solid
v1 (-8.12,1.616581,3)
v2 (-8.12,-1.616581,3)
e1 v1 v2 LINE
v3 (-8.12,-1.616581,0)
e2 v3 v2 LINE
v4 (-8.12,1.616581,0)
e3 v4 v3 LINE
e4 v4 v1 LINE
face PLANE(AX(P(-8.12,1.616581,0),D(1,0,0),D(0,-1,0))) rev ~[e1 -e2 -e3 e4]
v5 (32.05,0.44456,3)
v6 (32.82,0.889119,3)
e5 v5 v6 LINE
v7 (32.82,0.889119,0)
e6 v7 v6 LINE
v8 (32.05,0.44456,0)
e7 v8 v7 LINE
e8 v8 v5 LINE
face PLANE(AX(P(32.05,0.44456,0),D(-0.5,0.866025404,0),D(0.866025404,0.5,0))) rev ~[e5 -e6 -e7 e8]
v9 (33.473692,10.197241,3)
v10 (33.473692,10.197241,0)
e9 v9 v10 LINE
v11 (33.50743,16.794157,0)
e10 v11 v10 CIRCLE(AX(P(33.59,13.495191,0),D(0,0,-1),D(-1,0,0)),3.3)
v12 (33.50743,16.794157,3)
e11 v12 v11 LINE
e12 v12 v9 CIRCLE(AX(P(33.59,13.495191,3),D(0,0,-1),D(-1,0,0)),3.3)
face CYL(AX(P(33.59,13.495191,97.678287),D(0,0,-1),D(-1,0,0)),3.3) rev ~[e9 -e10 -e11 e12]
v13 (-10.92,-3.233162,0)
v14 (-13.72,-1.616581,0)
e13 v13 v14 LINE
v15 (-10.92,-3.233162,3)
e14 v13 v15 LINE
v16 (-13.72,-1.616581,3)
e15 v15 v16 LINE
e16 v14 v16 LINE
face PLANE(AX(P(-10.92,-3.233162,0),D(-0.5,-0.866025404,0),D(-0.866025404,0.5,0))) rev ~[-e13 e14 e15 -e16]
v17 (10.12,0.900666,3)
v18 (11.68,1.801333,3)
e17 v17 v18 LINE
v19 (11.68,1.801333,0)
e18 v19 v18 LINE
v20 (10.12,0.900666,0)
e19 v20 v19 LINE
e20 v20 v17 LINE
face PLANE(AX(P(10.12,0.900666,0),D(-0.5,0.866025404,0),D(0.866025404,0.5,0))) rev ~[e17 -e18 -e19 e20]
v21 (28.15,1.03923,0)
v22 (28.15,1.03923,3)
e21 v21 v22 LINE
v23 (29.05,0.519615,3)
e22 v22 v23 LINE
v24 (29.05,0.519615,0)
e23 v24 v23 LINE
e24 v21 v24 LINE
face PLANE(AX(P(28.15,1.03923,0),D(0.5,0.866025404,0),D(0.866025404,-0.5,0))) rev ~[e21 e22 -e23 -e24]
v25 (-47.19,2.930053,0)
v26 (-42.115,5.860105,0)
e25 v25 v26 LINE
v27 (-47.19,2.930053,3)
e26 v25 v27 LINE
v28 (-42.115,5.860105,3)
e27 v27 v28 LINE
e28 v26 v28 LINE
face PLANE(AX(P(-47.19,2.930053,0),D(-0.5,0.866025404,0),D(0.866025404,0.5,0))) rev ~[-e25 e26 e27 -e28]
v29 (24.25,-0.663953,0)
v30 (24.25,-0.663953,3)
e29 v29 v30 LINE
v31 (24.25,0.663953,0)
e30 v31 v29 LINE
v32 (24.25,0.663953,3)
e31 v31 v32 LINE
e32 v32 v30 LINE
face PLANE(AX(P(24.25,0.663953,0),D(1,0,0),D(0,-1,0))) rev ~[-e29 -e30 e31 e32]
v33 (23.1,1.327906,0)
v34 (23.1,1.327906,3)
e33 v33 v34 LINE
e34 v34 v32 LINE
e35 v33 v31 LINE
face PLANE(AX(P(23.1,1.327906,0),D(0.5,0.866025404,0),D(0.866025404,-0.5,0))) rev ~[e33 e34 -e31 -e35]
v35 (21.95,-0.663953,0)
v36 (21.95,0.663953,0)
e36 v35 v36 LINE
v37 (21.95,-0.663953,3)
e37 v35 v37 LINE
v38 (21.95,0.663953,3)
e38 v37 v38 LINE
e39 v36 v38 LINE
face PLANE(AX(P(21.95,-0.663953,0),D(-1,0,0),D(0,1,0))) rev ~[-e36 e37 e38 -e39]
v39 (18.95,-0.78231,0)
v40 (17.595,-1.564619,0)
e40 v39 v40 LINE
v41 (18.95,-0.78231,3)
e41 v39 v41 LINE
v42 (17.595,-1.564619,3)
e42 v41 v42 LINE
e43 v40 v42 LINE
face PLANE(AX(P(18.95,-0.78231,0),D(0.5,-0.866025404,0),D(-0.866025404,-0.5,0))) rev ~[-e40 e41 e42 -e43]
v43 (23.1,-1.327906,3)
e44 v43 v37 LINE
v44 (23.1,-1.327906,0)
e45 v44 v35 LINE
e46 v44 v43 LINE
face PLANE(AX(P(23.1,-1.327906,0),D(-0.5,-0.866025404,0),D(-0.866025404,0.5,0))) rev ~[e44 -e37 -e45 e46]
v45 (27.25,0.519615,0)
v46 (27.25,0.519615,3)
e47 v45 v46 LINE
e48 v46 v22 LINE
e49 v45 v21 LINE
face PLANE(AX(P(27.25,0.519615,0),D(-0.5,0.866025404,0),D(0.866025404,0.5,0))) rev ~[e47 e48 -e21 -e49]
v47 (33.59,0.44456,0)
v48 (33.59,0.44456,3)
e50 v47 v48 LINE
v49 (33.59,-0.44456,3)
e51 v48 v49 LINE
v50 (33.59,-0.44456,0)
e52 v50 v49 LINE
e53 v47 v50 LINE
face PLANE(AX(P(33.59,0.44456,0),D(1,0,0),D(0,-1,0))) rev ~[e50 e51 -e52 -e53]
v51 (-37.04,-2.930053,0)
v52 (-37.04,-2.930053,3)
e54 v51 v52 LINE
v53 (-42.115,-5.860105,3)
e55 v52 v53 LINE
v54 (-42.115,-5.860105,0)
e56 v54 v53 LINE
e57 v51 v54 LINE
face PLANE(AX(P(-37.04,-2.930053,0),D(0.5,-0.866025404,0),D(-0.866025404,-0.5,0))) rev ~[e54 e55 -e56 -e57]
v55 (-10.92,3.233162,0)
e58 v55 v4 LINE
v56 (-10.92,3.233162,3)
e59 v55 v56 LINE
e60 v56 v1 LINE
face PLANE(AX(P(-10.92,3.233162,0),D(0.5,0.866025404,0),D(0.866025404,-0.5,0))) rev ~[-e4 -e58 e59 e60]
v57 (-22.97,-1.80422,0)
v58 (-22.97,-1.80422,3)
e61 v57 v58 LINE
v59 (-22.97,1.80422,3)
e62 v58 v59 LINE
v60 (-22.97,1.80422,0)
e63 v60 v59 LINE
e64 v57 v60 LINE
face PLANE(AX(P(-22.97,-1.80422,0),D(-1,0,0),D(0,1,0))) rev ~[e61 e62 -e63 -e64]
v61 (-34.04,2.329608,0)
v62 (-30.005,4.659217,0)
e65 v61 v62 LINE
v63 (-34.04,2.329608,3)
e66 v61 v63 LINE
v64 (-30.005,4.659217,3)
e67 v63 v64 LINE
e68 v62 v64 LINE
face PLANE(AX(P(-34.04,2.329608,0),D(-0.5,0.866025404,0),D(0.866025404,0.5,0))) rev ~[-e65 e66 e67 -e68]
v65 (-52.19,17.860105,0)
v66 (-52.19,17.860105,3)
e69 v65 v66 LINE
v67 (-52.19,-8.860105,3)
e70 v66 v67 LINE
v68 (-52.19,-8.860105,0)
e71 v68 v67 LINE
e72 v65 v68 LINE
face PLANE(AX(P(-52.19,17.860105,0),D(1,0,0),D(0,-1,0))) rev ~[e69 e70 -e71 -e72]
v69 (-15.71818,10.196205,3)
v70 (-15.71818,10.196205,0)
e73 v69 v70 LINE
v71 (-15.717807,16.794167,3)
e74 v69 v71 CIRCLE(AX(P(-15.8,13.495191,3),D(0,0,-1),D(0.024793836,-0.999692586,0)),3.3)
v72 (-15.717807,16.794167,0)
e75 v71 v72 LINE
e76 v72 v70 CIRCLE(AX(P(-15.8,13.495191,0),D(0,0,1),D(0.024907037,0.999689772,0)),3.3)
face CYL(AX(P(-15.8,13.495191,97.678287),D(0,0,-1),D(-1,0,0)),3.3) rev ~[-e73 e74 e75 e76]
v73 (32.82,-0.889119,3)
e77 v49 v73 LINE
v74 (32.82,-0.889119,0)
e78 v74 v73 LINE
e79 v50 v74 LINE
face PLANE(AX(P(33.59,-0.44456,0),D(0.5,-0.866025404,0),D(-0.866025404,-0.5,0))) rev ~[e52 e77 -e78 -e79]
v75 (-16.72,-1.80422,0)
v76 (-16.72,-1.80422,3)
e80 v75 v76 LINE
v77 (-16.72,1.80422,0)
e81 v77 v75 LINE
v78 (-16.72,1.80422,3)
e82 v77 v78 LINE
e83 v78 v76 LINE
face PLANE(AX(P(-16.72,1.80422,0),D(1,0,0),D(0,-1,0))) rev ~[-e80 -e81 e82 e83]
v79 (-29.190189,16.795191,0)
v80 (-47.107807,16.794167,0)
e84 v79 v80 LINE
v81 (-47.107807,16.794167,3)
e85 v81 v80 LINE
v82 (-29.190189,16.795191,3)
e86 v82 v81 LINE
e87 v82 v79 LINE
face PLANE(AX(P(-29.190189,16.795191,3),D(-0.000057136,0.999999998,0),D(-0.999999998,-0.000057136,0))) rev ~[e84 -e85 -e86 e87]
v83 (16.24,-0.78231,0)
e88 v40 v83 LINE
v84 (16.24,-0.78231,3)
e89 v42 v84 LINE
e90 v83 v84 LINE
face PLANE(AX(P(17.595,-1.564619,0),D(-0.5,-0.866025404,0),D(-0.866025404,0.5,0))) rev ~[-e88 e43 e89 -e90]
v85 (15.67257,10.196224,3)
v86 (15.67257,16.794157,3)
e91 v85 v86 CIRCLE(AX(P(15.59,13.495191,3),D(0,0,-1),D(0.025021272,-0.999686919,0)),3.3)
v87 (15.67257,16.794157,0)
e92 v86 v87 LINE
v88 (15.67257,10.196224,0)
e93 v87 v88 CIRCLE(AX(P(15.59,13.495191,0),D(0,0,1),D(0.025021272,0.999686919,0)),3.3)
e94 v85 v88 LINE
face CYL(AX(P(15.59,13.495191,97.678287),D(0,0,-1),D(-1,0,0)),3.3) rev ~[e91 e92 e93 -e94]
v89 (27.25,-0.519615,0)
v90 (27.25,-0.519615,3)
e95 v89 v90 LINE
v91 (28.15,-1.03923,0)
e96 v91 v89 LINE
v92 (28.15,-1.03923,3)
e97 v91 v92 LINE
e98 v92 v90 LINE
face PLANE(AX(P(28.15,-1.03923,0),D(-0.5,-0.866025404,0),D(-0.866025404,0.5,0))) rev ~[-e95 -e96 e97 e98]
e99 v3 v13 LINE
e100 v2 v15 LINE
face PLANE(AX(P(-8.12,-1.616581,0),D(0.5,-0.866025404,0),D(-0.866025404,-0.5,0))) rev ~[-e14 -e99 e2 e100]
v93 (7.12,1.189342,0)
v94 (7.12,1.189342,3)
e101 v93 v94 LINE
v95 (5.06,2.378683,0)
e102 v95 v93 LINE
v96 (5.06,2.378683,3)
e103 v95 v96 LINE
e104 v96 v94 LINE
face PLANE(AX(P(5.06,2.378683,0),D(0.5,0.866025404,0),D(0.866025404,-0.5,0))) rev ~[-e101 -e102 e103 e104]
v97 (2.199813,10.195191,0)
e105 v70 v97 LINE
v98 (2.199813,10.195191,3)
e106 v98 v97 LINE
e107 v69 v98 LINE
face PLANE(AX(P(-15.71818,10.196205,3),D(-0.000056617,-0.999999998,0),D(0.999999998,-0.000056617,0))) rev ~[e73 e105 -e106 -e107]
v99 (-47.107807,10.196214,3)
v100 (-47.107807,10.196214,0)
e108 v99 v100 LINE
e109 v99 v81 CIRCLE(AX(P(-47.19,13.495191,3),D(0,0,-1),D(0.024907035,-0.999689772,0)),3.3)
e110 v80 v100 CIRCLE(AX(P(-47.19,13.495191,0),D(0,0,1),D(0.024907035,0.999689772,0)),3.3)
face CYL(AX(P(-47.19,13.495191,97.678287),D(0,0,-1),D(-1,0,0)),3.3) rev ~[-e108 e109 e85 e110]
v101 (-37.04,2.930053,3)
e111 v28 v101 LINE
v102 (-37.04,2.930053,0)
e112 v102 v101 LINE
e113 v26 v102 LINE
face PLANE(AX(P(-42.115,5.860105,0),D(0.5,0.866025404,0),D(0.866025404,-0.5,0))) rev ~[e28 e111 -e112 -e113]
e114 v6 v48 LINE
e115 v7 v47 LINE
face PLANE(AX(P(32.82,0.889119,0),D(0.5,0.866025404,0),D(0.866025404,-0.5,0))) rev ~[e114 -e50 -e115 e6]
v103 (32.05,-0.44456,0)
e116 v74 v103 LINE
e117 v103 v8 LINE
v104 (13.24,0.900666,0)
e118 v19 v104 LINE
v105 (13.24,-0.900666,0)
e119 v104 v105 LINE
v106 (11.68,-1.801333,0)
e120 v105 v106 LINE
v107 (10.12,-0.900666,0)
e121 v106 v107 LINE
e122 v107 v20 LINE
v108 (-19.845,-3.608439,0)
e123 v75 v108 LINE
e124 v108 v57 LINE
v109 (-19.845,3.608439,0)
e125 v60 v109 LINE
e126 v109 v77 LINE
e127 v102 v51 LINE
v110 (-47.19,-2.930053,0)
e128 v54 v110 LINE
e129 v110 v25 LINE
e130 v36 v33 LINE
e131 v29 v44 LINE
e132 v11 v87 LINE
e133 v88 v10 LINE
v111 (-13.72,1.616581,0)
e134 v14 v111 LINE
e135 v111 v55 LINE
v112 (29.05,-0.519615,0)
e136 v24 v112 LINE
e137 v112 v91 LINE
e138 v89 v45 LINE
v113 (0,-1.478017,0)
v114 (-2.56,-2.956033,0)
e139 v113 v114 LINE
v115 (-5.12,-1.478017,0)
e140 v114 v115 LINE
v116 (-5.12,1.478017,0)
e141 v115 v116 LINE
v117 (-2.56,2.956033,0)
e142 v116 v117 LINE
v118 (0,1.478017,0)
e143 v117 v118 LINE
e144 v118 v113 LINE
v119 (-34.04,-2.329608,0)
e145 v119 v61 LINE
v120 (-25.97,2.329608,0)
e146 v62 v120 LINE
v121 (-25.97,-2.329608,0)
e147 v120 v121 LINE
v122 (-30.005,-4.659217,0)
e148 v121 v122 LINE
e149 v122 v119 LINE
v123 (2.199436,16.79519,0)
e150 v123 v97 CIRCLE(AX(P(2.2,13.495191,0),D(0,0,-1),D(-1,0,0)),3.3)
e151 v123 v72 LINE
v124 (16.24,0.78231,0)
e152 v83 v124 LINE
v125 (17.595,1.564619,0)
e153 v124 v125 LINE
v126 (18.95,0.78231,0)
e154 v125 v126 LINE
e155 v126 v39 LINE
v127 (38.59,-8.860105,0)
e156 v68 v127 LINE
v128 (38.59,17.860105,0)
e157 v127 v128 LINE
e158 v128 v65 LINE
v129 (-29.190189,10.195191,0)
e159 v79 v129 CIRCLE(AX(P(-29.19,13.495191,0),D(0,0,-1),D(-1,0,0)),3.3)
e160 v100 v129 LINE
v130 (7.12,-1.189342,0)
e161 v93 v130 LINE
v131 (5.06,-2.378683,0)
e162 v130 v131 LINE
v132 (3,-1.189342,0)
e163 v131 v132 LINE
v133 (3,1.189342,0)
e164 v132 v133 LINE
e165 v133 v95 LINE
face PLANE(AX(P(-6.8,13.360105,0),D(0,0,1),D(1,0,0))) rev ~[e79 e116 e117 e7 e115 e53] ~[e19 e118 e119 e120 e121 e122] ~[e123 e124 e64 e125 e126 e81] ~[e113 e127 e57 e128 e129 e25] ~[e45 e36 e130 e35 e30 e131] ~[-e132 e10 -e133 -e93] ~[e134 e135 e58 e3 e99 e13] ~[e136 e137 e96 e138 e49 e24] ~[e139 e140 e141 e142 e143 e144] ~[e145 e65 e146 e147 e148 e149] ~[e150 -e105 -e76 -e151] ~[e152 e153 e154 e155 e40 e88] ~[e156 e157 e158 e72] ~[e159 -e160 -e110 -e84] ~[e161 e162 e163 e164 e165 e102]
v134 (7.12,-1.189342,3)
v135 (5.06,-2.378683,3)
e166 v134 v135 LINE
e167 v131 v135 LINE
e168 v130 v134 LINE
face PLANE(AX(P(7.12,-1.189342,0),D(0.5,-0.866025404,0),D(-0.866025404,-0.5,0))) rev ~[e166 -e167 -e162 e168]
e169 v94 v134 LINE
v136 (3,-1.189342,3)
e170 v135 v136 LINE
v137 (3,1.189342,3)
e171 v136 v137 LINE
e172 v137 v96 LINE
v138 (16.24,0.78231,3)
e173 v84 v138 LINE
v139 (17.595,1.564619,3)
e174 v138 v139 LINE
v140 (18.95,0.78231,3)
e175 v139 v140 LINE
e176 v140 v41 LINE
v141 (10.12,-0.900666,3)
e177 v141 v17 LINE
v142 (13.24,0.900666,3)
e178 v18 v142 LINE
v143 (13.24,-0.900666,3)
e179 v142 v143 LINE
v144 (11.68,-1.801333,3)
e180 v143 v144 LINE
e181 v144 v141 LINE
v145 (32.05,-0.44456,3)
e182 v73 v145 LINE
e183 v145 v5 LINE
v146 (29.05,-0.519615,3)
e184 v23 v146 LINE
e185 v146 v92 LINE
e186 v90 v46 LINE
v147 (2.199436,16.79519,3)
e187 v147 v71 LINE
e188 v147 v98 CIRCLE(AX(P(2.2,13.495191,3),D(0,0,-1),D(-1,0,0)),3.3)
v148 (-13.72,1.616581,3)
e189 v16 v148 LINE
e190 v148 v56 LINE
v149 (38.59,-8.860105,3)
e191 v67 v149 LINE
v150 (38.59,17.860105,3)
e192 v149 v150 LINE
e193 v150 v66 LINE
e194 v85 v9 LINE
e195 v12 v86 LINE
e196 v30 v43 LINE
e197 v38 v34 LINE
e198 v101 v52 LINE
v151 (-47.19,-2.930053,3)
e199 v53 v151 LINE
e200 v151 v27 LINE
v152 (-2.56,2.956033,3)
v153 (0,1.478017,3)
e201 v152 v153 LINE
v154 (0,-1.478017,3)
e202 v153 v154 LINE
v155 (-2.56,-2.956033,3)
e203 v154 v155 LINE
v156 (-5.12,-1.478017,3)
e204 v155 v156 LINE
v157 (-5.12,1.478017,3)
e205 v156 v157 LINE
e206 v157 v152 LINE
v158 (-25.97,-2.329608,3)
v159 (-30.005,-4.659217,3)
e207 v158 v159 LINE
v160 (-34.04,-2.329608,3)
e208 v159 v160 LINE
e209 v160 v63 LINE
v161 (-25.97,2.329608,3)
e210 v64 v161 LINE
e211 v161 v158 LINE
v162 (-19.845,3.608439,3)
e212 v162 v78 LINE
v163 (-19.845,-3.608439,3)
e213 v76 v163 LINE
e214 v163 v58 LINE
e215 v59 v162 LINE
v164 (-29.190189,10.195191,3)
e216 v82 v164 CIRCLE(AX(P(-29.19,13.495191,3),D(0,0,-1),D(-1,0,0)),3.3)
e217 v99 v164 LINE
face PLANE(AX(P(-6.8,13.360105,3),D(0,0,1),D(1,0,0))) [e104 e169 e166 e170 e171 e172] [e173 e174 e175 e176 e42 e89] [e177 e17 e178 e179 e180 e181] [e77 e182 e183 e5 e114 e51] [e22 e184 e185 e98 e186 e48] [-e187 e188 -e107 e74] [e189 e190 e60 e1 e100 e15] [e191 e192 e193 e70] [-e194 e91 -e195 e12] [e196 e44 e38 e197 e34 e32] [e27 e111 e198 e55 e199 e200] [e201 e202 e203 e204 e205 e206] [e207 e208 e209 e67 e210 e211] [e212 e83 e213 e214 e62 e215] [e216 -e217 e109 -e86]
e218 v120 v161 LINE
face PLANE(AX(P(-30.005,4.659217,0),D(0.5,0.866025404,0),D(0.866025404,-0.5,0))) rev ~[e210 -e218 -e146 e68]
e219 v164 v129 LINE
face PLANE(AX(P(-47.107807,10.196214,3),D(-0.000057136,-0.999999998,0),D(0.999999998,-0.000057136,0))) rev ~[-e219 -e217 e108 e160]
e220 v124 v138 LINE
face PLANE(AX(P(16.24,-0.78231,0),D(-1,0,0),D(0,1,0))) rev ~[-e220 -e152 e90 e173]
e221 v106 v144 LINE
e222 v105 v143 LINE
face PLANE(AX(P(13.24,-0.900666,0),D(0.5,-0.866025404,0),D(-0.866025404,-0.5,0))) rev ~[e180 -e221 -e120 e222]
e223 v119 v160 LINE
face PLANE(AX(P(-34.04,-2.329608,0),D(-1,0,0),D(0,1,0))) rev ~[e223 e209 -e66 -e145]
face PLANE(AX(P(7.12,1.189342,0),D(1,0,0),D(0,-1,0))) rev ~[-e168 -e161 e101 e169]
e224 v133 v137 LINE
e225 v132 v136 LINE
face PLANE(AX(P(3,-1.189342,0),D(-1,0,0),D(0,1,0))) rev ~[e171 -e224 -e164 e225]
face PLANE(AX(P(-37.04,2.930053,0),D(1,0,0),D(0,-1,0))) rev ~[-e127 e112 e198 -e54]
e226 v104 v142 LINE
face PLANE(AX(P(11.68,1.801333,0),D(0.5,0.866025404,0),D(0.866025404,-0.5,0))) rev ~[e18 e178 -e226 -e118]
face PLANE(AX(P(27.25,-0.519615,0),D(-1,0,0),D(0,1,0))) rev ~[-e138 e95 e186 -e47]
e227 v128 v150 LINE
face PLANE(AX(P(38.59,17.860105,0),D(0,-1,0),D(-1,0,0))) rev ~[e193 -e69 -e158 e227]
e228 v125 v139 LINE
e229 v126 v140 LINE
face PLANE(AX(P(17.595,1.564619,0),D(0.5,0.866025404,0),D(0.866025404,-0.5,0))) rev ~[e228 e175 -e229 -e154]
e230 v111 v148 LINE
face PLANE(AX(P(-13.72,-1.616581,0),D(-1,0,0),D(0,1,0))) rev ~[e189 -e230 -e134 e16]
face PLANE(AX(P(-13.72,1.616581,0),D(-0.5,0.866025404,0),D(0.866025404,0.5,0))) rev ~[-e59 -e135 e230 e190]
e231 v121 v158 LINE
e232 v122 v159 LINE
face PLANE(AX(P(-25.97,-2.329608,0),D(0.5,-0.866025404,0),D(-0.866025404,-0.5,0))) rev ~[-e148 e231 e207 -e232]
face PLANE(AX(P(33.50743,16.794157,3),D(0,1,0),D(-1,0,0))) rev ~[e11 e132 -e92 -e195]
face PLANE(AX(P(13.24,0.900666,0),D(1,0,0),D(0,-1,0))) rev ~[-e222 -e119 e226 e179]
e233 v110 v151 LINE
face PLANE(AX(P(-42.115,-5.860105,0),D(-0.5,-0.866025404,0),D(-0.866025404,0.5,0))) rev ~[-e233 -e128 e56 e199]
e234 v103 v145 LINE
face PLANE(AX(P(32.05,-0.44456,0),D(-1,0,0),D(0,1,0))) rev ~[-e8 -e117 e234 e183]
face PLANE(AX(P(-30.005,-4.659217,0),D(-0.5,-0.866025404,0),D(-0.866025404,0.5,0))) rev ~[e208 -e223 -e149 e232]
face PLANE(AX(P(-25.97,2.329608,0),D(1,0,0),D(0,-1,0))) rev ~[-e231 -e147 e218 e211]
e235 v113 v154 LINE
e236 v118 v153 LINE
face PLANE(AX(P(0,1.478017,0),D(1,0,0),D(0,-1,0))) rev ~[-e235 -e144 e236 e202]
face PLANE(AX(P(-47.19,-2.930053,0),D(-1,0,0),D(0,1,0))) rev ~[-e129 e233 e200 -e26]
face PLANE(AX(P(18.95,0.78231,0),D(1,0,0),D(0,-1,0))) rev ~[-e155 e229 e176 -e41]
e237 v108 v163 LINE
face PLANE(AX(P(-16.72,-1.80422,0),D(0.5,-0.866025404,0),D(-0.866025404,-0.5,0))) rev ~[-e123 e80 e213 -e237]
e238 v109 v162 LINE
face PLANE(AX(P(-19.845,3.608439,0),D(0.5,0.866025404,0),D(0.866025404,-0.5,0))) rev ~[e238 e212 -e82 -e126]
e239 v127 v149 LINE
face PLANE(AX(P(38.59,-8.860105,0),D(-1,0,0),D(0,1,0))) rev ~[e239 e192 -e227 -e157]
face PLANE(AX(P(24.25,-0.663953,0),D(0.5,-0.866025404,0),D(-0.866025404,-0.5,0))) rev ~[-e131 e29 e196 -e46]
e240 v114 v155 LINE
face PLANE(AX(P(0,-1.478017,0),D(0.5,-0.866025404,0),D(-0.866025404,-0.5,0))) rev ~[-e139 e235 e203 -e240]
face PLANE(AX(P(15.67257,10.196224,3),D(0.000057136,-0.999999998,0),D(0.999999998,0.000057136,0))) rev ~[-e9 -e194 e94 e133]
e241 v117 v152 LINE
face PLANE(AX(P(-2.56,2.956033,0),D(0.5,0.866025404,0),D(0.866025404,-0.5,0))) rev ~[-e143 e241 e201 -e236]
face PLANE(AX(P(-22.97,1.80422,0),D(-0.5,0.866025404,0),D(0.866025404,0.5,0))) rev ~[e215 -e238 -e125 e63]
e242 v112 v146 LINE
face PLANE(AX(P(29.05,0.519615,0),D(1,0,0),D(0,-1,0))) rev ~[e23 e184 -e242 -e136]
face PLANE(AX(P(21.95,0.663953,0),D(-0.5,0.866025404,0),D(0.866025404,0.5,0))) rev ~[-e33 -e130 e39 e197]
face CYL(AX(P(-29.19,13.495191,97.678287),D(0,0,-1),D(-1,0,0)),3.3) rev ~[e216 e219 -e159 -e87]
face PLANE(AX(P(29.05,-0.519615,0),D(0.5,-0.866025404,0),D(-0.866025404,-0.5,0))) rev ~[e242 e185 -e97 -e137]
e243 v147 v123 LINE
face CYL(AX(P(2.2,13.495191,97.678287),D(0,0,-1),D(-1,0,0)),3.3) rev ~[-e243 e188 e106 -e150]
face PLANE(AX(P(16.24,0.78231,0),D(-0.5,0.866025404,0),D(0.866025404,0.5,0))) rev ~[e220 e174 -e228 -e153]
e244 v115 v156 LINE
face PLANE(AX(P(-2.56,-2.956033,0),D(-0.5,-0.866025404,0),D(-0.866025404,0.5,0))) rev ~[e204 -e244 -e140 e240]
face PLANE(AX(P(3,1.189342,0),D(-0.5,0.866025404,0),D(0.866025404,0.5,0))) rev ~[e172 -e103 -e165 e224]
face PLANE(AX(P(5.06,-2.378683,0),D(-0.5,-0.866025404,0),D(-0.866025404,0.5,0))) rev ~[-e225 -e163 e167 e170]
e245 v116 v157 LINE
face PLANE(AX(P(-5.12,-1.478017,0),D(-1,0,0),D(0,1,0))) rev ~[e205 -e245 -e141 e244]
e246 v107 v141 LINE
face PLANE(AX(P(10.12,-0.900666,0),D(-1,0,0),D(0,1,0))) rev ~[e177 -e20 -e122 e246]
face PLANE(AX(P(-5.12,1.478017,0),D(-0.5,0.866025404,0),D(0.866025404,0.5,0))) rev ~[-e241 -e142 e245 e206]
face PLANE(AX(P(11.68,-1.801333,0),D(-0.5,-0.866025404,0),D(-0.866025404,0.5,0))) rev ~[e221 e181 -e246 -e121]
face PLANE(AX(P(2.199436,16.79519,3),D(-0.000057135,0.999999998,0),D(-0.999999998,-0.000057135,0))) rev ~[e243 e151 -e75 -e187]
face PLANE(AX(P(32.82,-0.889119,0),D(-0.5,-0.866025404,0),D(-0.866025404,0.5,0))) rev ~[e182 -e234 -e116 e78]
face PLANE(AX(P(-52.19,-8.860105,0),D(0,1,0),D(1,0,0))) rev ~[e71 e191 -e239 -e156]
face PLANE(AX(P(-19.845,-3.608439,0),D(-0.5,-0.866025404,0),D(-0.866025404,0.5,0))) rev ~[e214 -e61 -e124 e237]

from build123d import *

# Parameters (mm, degrees)
F0_W     = 90.78
F0_H     = 17.7202104645
F1_DEPTH = 3
F3_D     = 6.6
F5_DEPTH = 25


with BuildPart() as f1:
    # F0 (on Top) → F1 (new body)
    with BuildSketch(Plane.XY):
        Polygon((-52.19, 13.3601052323), (-52.19, 8.8601052323), (38.59, 8.8601052323), (38.59, 13.3601052323), (38.59, 17.8601052323), (-52.19, 17.8601052323), align=None)
        with Locations((-6.8, 0)):
            Rectangle(F0_W, F0_H)
        Polygon((-42.115, 5.8601052323), (-37.04, 2.9300526161), (-37.04, -2.9300526161), (-42.115, -5.8601052323), (-47.19, -2.9300526161), (-47.19, 2.9300526161), align=None, mode=Mode.SUBTRACT)
        Polygon((-30.005, 4.6592166724), (-25.97, 2.3296083362), (-25.97, -2.3296083362), (-30.005, -4.6592166724), (-34.04, -2.3296083362), (-34.04, 2.3296083362), align=None, mode=Mode.SUBTRACT)
        Polygon((-19.845, 3.6084391824), (-16.72, 1.8042195912), (-16.72, -1.8042195912), (-19.845, -3.6084391824), (-22.97, -1.8042195912), (-22.97, 1.8042195912), align=None, mode=Mode.SUBTRACT)
        Polygon((-10.92, 3.2331615075), (-8.12, 1.6165807537), (-8.12, -1.6165807537), (-10.92, -3.2331615075), (-13.72, -1.6165807537), (-13.72, 1.6165807537), align=None, mode=Mode.SUBTRACT)
        Polygon((-2.56, 2.9560333783), (0, 1.4780166891), (0, -1.4780166891), (-2.56, -2.9560333783), (-5.12, -1.4780166891), (-5.12, 1.4780166891), align=None, mode=Mode.SUBTRACT)
        Polygon((5.06, 2.3786831091), (7.12, 1.1893415545), (7.12, -1.1893415545), (5.06, -2.3786831091), (3, -1.1893415545), (3, 1.1893415545), align=None, mode=Mode.SUBTRACT)
        Polygon((11.68, 1.8013328399), (13.24, 0.9006664199), (13.24, -0.9006664199), (11.68, -1.8013328399), (10.12, -0.9006664199), (10.12, 0.9006664199), align=None, mode=Mode.SUBTRACT)
        Polygon((17.595, 1.5646192295), (18.95, 0.7823096148), (18.95, -0.7823096148), (17.595, -1.5646192295), (16.24, -0.7823096148), (16.24, 0.7823096148), align=None, mode=Mode.SUBTRACT)
        Polygon((23.1, 1.3279056191), (24.25, 0.6639528096), (24.25, -0.6639528096), (23.1, -1.3279056191), (21.95, -0.6639528096), (21.95, 0.6639528096), align=None, mode=Mode.SUBTRACT)
        Polygon((28.15, 1.0392304845), (29.05, 0.5196152423), (29.05, -0.5196152423), (28.15, -1.0392304845), (27.25, -0.5196152423), (27.25, 0.5196152423), align=None, mode=Mode.SUBTRACT)
        Polygon((32.82, 0.8891194146), (33.59, 0.4445597073), (33.59, -0.4445597073), (32.82, -0.8891194146), (32.05, -0.4445597073), (32.05, 0.4445597073), align=None, mode=Mode.SUBTRACT)
    extrude(amount=F1_DEPTH)

    # F3 (through all)
    with Locations(Plane.XY.offset(3)):
        with Locations((-47.19, 13.4951905284), (-29.19, 13.4951905284), (-15.8, 13.4951905284), (2.2, 13.4951905284), (15.59, 13.4951905284), (33.59, 13.4951905284)):
            Hole(F3_D / 2)

    # F4 (on face) → F5 (cut)
    with BuildSketch(Plane.XY.offset(3)):
        with BuildLine():
            Line((-29.1901885501, 16.795190523), (-47.1078067859, 16.794166775))
            ThreePointArc((-47.1078067859, 16.794166775), (-44.8276666613, 15.79939998), (-43.89, 13.4951905284))
            ThreePointArc((-43.89, 13.4951905284), (-44.8276666613, 11.1909810768), (-47.1078067859, 10.1962142818))
            Line((-47.1078067859, 10.1962142818), (-29.1901885501, 10.1951905338))
            ThreePointArc((-29.1901885501, 10.1951905338), (-32.49, 13.4951905284), (-29.1901885501, 16.795190523))
        make_face()
        with BuildLine():
            Line((2.1994360639, 16.7951904802), (-15.7178067781, 16.7941667748))
            ThreePointArc((-15.7178067781, 16.7941667748), (-13.4376666586, 15.7993999772), (-12.5, 13.4951905284))
            ThreePointArc((-12.5, 13.4951905284), (-13.4377971224, 11.1908473324), (-15.7181803424, 10.1962049959))
            Line((-15.7181803424, 10.1962049959), (2.1998131641, 10.1951905337))
            ThreePointArc((2.1998131641, 10.1951905337), (-1.0999999946, 13.4950019783), (2.1994360639, 16.7951904802))
        make_face()
        with BuildLine():
            Line((33.5074298033, 16.794157361), (15.6725701967, 16.794157361))
            ThreePointArc((15.6725701967, 16.794157361), (17.9524649891, 15.799265001), (18.89, 13.4951905284))
            ThreePointArc((18.89, 13.4951905284), (17.9524649891, 11.1911160558), (15.6725701967, 10.1962236958))
            Line((15.6725701967, 10.1962236958), (33.4736921866, 10.1972407876))
            ThreePointArc((33.4736921866, 10.1972407876), (30.2900431541, 13.5120670006), (33.5074298033, 16.794157361))
        make_face()
    extrude(amount=-F5_DEPTH, mode=Mode.SUBTRACT)


solid = f1.part
